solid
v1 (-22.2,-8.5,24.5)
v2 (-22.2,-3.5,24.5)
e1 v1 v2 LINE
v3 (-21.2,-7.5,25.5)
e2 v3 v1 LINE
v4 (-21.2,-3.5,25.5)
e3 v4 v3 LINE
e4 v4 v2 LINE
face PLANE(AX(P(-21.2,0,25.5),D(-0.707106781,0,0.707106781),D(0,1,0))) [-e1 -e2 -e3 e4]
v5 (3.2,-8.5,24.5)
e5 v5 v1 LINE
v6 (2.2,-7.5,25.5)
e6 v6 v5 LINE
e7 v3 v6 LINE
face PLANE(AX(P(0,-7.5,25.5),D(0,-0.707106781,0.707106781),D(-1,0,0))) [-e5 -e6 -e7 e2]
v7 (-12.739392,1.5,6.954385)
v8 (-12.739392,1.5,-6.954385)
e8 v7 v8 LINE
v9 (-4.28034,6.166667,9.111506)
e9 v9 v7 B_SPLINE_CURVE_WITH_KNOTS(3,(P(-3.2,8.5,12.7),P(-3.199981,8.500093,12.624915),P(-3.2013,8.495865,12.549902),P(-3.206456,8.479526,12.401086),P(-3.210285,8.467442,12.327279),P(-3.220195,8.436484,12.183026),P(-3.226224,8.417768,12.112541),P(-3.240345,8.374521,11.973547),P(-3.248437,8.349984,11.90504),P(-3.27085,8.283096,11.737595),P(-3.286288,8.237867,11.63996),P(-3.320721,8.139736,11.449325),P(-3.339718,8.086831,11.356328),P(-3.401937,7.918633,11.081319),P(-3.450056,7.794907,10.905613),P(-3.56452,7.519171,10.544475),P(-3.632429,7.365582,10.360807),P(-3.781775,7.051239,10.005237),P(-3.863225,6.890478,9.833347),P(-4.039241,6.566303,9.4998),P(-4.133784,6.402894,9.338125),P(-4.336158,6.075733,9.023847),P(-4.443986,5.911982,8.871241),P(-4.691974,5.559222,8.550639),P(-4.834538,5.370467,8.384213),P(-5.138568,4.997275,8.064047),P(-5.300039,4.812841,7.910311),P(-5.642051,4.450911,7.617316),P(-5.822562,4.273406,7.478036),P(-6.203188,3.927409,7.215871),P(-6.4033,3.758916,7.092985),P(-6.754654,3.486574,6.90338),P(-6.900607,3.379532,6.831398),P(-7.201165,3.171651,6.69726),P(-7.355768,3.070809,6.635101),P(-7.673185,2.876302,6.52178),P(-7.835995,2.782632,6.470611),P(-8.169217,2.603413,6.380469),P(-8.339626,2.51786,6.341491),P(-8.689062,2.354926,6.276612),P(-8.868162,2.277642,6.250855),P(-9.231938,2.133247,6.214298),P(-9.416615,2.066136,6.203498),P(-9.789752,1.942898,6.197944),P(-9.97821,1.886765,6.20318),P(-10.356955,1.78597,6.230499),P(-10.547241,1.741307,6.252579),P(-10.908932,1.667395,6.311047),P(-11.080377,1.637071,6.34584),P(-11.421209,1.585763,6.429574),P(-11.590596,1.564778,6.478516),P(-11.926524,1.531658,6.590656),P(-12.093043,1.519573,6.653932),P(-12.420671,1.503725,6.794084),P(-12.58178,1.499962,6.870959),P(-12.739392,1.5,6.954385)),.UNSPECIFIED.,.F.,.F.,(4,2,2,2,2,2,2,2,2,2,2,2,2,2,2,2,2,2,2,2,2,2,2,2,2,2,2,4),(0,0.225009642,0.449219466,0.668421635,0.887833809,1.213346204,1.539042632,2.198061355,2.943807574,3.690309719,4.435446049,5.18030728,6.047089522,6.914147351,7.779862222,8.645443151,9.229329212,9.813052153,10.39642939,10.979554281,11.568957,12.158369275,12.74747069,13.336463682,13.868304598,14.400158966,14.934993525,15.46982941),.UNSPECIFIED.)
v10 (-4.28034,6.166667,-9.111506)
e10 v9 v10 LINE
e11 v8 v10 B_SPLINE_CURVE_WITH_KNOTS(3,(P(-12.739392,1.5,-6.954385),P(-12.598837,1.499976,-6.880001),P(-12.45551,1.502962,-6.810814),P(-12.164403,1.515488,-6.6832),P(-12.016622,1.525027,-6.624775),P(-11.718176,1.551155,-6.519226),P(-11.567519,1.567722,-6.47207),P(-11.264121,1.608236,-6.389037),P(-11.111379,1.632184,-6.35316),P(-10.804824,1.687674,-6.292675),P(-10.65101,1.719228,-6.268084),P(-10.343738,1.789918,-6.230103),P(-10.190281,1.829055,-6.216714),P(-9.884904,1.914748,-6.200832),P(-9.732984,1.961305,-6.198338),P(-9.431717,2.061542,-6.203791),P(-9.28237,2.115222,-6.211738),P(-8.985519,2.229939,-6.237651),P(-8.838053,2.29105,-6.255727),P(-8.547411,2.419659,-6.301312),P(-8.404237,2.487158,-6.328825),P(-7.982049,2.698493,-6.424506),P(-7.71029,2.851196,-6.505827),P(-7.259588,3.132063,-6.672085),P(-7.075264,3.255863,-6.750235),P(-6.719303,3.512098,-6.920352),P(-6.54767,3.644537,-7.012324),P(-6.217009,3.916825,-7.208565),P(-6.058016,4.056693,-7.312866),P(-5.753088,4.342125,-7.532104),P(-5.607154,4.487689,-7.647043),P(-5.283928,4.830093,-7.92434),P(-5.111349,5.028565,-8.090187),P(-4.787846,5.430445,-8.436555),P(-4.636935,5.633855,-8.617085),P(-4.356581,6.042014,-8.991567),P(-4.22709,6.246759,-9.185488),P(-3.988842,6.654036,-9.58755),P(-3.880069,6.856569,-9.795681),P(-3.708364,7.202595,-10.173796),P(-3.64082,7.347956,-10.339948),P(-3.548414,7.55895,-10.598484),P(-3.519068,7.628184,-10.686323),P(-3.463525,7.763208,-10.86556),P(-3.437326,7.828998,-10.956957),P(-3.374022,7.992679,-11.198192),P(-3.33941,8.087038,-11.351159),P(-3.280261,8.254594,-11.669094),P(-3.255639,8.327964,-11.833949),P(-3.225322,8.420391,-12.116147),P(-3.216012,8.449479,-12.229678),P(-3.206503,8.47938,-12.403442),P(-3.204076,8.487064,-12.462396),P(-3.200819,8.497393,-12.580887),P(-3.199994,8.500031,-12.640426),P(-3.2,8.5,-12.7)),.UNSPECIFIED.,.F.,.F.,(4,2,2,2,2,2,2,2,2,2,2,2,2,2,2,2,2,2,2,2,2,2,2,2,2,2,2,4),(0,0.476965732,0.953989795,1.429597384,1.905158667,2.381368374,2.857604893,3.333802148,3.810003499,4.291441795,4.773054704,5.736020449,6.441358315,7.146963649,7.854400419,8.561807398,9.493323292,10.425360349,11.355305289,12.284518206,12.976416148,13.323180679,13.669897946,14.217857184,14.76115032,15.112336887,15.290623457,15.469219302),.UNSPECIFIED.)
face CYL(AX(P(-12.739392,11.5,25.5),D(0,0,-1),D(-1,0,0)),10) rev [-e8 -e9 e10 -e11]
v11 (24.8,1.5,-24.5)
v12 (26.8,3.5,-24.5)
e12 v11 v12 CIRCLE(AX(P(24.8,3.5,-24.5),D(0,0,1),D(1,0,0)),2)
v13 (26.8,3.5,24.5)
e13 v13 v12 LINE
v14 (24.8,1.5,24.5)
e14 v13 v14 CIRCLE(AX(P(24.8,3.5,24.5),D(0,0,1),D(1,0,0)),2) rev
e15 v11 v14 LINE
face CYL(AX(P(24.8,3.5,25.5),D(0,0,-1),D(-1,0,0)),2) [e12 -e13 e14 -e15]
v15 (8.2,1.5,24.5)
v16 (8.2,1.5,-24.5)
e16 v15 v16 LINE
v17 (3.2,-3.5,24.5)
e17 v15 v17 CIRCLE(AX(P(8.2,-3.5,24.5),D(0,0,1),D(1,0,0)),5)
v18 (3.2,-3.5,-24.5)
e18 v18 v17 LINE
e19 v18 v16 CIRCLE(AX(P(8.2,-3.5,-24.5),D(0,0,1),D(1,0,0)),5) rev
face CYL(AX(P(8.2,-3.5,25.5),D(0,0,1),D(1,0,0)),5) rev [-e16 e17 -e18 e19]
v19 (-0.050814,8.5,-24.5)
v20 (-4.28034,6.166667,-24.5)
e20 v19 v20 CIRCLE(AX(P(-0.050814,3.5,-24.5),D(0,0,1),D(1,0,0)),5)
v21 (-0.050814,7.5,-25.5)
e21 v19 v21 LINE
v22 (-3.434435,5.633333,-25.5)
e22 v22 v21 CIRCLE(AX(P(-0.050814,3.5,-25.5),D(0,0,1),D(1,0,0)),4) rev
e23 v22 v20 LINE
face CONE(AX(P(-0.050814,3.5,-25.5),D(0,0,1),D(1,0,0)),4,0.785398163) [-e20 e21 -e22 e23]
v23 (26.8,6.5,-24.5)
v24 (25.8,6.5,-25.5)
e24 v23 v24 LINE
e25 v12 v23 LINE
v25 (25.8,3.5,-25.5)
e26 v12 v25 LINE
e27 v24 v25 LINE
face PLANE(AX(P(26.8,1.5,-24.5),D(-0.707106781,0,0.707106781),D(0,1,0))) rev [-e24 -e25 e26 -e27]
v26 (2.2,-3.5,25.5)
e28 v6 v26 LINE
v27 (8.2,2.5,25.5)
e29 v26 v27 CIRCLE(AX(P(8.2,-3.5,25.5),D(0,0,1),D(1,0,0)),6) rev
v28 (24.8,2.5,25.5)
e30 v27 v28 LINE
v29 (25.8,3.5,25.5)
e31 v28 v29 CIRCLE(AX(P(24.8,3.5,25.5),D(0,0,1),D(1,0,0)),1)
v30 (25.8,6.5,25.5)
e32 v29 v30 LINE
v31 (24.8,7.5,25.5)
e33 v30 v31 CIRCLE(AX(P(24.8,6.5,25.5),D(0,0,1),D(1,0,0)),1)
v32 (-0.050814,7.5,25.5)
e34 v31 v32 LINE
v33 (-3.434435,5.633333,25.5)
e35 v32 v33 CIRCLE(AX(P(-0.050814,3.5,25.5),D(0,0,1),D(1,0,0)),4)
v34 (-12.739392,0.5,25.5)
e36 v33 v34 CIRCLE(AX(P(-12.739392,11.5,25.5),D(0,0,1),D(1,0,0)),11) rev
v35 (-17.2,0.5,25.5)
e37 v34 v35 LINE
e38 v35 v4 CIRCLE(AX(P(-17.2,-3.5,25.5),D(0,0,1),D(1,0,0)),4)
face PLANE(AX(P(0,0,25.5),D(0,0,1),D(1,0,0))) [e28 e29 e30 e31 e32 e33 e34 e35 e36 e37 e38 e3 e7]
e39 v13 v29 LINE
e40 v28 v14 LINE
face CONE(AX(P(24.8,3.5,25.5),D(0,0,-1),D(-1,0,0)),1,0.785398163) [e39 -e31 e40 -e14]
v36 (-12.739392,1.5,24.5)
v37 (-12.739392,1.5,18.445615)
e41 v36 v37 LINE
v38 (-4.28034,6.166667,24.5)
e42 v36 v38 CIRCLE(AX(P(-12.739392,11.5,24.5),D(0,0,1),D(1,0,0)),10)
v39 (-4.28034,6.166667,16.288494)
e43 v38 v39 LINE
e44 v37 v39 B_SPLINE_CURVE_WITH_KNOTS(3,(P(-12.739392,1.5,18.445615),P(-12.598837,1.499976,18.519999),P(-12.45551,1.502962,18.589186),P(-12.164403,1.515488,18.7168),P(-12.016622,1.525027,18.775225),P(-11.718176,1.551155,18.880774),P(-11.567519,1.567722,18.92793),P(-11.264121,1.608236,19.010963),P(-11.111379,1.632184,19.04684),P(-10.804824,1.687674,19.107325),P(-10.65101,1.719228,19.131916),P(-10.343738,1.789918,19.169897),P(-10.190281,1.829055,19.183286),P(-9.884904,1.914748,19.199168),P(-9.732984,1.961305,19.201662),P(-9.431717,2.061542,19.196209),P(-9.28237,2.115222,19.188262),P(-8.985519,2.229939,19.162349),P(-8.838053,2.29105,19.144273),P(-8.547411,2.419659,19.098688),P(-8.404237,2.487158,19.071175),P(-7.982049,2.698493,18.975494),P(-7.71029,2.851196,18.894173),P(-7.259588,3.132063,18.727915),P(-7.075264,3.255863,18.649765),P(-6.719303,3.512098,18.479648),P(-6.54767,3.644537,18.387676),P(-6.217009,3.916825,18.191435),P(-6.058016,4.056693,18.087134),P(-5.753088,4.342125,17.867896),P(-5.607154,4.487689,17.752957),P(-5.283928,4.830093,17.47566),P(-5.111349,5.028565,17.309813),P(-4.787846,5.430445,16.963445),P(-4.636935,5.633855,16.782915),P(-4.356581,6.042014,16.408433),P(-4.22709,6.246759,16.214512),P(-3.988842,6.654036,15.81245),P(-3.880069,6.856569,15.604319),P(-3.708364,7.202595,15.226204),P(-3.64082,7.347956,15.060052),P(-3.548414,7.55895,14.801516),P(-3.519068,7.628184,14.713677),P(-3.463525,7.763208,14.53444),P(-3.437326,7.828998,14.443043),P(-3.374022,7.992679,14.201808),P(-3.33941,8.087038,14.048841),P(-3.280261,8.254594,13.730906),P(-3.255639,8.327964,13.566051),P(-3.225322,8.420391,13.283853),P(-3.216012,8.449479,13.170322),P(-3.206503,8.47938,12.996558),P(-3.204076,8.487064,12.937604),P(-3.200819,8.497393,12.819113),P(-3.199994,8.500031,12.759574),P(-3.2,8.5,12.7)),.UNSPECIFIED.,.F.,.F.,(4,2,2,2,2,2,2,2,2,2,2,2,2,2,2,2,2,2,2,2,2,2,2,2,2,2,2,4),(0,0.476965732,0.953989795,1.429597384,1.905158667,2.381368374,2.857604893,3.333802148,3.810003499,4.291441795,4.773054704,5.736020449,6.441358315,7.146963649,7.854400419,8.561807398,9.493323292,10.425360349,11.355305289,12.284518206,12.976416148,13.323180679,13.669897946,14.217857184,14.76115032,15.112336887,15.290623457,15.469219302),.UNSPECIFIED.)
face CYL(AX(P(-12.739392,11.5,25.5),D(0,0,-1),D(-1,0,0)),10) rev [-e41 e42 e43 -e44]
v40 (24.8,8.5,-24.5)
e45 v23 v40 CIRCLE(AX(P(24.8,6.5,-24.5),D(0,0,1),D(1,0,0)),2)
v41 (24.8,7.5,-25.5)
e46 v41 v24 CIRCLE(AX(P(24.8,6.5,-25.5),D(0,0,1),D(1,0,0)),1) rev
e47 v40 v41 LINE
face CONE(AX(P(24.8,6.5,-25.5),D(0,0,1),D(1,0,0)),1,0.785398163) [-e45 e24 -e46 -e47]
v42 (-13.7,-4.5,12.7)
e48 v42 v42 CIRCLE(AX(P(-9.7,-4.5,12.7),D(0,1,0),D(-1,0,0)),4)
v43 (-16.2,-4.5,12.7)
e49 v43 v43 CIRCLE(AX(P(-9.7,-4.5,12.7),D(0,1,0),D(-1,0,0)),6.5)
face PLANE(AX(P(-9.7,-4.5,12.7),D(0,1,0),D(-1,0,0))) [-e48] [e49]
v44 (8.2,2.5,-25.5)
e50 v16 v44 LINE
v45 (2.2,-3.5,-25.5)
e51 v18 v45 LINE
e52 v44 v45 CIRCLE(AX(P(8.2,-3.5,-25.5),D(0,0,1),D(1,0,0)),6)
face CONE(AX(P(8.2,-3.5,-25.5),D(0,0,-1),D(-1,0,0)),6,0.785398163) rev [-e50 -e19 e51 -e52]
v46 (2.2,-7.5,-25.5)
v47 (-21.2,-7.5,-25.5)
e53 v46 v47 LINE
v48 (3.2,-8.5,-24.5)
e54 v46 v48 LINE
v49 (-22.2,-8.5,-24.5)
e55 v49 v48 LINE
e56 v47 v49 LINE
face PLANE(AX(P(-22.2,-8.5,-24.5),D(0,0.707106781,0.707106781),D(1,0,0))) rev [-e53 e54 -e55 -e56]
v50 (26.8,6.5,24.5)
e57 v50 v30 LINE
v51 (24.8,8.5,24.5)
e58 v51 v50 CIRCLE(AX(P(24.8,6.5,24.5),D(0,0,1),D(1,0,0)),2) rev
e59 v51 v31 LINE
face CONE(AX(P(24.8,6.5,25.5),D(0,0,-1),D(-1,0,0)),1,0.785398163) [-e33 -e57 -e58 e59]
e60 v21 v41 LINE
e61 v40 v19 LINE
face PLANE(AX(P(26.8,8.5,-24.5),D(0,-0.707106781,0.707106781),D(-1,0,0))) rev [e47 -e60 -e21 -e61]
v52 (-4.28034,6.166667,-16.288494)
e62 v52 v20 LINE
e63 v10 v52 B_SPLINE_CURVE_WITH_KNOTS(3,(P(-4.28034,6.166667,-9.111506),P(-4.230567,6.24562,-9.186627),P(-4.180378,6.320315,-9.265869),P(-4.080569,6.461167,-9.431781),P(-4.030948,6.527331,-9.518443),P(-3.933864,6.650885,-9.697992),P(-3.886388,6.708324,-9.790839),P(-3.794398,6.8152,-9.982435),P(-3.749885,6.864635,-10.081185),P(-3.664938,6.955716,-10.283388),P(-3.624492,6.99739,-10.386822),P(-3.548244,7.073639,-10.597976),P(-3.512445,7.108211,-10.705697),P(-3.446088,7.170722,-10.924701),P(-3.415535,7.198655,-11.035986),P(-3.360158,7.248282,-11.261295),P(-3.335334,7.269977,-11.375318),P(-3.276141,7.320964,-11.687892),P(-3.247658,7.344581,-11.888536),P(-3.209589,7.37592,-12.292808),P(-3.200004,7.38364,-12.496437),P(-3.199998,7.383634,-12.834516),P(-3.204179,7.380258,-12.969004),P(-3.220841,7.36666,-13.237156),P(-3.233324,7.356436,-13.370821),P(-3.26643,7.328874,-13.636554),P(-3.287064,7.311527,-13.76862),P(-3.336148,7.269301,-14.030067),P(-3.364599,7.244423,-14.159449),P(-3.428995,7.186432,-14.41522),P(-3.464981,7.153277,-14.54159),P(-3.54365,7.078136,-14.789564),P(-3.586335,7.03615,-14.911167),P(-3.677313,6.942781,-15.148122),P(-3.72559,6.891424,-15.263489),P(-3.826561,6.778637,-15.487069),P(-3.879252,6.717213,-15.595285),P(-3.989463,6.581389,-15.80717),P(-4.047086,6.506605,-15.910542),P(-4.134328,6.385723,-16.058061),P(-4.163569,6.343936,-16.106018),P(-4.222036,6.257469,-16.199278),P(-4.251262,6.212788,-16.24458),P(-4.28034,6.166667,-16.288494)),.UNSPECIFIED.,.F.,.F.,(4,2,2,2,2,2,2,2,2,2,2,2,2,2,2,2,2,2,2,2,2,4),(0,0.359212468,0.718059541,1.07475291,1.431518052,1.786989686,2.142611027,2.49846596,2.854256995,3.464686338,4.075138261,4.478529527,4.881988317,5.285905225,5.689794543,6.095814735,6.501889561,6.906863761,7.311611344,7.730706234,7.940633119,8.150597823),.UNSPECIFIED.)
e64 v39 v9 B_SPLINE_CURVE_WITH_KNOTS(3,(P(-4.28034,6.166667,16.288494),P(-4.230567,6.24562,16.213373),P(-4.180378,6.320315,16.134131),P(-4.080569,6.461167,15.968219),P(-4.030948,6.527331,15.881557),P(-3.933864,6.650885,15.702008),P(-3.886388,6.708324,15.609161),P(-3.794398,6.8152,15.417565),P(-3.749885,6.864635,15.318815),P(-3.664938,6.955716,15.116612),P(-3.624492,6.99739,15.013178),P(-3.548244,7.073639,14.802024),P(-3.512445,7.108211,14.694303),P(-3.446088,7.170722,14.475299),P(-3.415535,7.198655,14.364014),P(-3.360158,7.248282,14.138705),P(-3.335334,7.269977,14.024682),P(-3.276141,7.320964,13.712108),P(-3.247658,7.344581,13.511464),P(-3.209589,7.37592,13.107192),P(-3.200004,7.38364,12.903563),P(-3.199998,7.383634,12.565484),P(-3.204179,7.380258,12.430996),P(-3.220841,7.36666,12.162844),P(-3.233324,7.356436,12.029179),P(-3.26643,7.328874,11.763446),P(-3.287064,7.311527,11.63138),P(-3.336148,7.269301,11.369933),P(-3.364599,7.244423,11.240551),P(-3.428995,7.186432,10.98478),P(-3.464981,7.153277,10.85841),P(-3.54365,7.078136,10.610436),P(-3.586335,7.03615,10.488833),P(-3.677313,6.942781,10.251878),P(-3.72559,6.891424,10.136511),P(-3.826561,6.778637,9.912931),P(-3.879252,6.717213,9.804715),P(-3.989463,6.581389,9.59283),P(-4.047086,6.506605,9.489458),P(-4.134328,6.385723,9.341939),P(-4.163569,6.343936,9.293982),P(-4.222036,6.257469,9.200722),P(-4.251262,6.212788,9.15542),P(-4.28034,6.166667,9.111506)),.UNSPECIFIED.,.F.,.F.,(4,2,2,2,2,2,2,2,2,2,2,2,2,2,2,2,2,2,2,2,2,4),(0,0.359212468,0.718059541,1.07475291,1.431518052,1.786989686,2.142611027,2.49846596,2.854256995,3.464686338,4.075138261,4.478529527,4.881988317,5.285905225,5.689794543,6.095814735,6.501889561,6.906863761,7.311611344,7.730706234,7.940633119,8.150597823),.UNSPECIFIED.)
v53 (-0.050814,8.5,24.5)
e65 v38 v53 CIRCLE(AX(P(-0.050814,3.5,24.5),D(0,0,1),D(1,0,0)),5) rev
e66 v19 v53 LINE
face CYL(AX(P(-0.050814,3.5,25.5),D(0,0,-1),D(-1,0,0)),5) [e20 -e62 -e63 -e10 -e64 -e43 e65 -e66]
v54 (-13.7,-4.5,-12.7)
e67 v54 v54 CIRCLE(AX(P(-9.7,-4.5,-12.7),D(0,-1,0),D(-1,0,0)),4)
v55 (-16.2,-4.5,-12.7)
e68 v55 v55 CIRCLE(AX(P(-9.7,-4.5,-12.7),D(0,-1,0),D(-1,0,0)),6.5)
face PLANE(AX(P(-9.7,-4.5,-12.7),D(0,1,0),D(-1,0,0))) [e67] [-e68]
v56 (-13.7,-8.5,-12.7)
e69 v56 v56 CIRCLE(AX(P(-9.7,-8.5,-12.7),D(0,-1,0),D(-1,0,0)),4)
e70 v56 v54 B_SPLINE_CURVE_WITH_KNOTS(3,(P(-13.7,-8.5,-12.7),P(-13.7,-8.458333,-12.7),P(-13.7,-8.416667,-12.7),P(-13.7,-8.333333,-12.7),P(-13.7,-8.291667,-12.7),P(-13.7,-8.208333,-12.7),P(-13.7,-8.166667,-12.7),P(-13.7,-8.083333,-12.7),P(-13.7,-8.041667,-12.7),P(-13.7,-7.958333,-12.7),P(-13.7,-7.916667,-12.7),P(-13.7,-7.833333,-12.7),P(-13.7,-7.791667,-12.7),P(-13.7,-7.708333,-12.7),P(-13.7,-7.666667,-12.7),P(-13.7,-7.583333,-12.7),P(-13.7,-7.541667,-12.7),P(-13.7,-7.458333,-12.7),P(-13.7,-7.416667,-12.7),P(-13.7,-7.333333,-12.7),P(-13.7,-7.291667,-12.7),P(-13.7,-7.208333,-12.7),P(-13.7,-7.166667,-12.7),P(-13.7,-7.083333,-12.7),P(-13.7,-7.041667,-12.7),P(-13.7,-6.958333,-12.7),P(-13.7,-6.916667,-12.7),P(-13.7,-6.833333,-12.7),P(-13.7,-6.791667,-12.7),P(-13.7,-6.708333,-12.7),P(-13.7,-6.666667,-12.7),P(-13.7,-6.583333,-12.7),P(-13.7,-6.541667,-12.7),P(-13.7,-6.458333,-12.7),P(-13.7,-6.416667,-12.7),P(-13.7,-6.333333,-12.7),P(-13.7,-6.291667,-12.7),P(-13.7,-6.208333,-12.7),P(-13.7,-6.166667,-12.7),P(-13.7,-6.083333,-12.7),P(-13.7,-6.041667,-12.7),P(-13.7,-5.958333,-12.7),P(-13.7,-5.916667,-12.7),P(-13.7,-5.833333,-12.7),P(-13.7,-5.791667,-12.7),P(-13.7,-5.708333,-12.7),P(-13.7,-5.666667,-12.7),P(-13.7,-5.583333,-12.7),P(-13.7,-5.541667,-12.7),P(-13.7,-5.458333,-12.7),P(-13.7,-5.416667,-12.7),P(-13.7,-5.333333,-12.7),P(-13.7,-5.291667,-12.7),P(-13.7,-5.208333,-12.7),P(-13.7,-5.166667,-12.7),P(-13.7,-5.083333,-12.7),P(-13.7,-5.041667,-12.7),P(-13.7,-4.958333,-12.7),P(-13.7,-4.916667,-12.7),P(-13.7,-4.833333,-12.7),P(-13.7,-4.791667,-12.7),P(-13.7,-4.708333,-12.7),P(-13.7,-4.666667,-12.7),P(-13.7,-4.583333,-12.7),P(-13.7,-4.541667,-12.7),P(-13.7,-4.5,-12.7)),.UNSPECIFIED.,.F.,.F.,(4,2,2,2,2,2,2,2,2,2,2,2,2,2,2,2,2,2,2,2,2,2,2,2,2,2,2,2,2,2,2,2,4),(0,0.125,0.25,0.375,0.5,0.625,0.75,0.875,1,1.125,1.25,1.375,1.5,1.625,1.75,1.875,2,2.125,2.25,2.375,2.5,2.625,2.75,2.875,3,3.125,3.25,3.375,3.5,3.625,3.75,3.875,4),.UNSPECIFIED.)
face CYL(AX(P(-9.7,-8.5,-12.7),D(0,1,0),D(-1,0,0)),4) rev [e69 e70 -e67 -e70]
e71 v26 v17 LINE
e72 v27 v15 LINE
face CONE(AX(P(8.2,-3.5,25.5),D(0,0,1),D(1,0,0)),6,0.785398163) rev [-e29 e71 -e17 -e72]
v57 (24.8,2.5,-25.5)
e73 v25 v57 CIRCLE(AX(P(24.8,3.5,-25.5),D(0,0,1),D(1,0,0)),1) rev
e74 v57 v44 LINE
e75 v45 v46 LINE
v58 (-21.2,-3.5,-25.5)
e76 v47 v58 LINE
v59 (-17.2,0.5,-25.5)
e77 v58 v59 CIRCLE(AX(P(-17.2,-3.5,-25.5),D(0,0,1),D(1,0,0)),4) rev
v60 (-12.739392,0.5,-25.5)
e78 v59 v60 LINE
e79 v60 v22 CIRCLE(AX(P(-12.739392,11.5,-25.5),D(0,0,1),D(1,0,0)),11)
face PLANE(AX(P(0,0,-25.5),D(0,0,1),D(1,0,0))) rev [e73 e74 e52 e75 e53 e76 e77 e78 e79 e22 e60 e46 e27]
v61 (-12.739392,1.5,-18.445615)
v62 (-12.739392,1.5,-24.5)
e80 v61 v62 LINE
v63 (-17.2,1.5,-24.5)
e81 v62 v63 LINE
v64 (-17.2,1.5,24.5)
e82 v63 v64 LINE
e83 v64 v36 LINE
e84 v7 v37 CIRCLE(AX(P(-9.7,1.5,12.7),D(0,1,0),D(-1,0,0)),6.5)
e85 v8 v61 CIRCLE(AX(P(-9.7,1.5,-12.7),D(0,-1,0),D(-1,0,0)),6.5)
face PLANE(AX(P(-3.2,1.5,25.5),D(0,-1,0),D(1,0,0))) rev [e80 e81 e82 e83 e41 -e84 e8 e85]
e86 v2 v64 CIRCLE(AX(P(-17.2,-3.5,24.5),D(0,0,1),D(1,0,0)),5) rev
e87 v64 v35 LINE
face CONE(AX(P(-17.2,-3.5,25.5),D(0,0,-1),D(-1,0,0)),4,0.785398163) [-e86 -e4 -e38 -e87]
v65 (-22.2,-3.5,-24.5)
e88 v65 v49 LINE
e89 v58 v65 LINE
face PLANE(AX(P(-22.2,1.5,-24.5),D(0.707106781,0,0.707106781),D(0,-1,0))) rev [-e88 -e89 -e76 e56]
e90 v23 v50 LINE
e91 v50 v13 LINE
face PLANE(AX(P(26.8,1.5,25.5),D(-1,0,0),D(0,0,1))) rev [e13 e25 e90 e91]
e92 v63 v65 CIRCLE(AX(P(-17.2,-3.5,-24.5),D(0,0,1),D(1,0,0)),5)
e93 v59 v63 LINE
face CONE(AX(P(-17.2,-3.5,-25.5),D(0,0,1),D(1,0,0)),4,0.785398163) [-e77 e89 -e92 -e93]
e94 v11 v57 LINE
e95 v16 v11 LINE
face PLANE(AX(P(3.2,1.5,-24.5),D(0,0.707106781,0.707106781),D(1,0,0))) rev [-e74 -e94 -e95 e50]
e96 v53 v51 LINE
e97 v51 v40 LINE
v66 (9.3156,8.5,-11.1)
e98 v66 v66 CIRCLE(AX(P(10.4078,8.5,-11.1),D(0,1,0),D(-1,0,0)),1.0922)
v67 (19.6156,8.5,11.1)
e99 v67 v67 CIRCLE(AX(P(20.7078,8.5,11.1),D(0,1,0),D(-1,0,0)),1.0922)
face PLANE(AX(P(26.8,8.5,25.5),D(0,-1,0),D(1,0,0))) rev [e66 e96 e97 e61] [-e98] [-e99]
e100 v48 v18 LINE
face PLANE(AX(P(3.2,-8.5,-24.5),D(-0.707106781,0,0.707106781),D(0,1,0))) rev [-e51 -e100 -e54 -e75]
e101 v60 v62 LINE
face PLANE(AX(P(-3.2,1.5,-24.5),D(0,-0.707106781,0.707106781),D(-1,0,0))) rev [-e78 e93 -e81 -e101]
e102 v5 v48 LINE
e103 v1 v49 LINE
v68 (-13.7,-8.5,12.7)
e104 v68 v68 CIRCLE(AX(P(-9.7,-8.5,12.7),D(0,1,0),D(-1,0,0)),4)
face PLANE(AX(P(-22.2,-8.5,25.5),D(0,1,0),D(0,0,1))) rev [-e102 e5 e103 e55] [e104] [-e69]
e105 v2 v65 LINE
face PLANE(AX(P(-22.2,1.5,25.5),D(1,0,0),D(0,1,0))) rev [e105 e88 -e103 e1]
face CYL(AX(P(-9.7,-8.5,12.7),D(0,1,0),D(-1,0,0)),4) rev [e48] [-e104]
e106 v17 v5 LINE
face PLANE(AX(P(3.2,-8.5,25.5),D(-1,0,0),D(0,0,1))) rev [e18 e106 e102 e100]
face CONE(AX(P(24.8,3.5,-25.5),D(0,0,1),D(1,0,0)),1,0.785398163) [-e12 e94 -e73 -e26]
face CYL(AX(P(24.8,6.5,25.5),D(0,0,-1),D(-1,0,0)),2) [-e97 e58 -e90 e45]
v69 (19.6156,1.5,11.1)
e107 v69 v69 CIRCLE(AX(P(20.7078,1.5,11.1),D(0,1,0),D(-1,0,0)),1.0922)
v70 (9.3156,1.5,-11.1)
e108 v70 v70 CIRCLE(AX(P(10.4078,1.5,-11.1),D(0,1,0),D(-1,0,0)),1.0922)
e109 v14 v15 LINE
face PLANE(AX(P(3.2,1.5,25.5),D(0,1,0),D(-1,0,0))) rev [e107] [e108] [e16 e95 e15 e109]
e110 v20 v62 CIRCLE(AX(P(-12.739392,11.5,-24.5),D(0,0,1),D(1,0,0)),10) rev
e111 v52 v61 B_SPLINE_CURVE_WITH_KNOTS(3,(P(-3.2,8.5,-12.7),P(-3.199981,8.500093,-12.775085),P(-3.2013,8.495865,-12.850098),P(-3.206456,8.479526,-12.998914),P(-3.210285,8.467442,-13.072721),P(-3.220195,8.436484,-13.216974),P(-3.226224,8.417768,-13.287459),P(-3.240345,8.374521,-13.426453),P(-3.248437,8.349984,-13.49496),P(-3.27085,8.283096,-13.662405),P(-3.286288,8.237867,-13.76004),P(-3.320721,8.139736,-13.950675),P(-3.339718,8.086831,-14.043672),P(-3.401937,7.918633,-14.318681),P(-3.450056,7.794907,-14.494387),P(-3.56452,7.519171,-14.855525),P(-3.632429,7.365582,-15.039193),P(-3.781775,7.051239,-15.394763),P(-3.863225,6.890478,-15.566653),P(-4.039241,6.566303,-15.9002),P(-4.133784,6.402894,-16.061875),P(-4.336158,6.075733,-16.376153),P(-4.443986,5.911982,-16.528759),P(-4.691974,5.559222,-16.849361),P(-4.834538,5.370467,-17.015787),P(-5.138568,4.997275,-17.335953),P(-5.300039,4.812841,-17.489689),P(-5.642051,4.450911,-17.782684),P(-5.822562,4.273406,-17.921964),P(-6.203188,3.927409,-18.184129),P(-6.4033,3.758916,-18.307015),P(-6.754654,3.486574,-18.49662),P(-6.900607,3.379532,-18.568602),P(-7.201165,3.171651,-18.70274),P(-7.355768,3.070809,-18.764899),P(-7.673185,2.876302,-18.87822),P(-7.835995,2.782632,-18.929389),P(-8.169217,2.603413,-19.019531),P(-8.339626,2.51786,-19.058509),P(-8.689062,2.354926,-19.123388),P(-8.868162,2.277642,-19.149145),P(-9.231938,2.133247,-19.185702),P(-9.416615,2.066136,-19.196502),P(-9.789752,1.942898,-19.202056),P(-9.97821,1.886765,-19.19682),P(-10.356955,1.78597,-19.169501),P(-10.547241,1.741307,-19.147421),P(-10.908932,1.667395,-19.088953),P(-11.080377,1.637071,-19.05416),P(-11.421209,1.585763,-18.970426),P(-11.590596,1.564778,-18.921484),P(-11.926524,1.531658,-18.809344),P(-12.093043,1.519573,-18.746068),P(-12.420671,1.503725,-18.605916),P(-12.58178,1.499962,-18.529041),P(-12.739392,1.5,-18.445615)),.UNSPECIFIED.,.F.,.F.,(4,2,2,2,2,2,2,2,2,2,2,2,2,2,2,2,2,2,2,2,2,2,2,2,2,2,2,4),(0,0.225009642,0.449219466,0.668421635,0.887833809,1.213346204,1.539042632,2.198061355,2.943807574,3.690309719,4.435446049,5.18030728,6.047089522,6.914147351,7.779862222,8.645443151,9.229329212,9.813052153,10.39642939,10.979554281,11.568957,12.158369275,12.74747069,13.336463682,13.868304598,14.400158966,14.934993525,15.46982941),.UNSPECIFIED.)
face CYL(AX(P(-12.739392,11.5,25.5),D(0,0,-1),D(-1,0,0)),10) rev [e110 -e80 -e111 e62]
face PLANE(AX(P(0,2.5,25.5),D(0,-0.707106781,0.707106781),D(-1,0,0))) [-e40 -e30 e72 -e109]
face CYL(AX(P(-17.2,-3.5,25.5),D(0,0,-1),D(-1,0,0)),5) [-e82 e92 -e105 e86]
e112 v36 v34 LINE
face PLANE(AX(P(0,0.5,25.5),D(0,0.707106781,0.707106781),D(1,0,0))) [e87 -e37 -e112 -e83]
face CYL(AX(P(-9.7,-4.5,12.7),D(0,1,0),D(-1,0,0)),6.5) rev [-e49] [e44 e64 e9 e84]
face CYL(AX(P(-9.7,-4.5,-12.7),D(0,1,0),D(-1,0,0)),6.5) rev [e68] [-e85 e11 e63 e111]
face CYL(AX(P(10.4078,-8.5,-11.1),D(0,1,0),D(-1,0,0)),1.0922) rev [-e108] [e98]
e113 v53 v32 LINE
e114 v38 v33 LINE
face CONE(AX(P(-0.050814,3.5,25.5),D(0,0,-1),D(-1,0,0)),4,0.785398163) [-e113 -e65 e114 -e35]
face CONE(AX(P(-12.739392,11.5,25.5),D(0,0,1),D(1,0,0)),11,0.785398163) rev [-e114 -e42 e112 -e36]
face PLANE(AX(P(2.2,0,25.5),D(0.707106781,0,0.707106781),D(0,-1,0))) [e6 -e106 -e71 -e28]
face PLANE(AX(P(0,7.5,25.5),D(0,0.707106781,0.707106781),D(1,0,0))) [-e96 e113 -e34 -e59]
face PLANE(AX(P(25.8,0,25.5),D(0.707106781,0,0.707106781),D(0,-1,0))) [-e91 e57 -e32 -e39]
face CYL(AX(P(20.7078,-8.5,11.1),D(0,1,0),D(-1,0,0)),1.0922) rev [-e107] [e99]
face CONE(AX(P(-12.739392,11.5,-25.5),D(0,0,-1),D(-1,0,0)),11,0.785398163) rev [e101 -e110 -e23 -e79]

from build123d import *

# Parameters (mm, degrees)
BOSS_EXTRUDE1_DEPTH = 25.5
SKETCH3_R           = 4
CUT_EXTRUDE1_DEPTH  = 39.320882036
SKETCH3_4_R         = 6.5
SKETCH3_4_R_2       = 4
CUT_EXTRUDE2_DEPTH  = 6
SKETCH9_R           = 1.0922
CUT_EXTRUDE3_DEPTH  = 41.712283159
FILLET1_R           = 10
FILLET2_R           = 5
FILLET4_R           = 2
CHAMFER1_SIZE       = 1


with BuildPart() as part:
    # Sketch1 → Boss-Extrude1 (new, symmetric)
    with BuildSketch(Plane.XY):
        Polygon((-22.2, -8.5), (3.2, -8.5), (3.2, 1.5), (26.8, 1.5), (26.8, 8.5), (-3.2, 8.5), (-3.2, 1.5), (-22.2, 1.5), align=None)
    extrude(amount=BOSS_EXTRUDE1_DEPTH, both=True)

    # Sketch3 → Cut-Extrude1 (cut, through all)
    with BuildSketch(Plane(origin=(0, 1.5, 0), x_dir=(1, 0, 0), z_dir=(0, 1, 0))):
        with Locations(Location((-9.7, -12.7, 0), (0, 0, 180))):
            Circle(SKETCH3_R)
    cut_extrude1 = extrude(amount=-CUT_EXTRUDE1_DEPTH, mode=Mode.SUBTRACT)

    # Sketch3<4> → Cut-Extrude2 (cut)
    with BuildSketch(Plane(origin=(0, 1.5, 0), x_dir=(1, 0, 0), z_dir=(0, 1, 0))):
        with Locations(Location((-9.7, -12.7, 0), (0, 0, 180))):
            Circle(SKETCH3_4_R)
        with Locations(Location((-9.7, -12.7, 0), (0, 0, 180))):
            Circle(SKETCH3_4_R_2, mode=Mode.SUBTRACT)
    cut_extrude2 = extrude(amount=-CUT_EXTRUDE2_DEPTH, mode=Mode.SUBTRACT)

    # Mirror1: Cut-Extrude1, Cut-Extrude2 across plane
    add(cut_extrude1.mirror(Plane.XY), mode=Mode.SUBTRACT)
    add(cut_extrude2.mirror(Plane.XY), mode=Mode.SUBTRACT)

    # Sketch9 → Cut-Extrude3 (cut, through all)
    with BuildSketch(Plane(origin=(0, 8.5, 0), x_dir=(1, 0, 0), z_dir=(0, 1, 0))):
        with Locations(Location((10.4078, 11.1, 0), (0, 0, 180))):
            Circle(SKETCH9_R)
        with Locations(Location((20.7078, -11.1, 0), (0, 0, 180))):
            Circle(SKETCH9_R)
    extrude(amount=-CUT_EXTRUDE3_DEPTH, mode=Mode.SUBTRACT)

    # Fillet1
    # the kernel refuses this fillet: 10 mm, written as the material it adds along each edge
    with BuildSketch(Plane(origin=(-3.2, 1.5, 25.5), x_dir=(0, 1, 0), z_dir=(0, 0, -1))) as fillet1_piece_1_section:
        with BuildLine():
            CenterArc((10, -9.539392014), FILLET1_R, 107.457603124, 72.542396876)
            Line((0, -9.539392014), (0, 0))
            Line((0, 0), (7, 0))
        make_face()
    fillet1_piece_1 = extrude(amount=12.8, mode=Mode.PRIVATE)
    fillet1_piece_1 = fillet1_piece_1 - Plane(origin=(-9.7, 1.5, 12.7), x_dir=(-1, 0, 0), z_dir=(0, 1, 0)) * Cylinder(6.5, 64, mode=Mode.PRIVATE)
    add(fillet1_piece_1)
    with BuildSketch(Plane(origin=(-3.2, 1.5, -12.700000035), x_dir=(0, 1, 0), z_dir=(0, 0, -1))) as fillet1_piece_2_section:
        with BuildLine():
            CenterArc((10, -9.539392014), FILLET1_R, 107.457603124, 72.542396876)
            Line((0, -9.539392014), (0, 0))
            Line((0, 0), (7, 0))
        make_face()
    fillet1_piece_2 = extrude(amount=12.799999965, mode=Mode.PRIVATE)
    fillet1_piece_2 = fillet1_piece_2 - Plane(origin=(-9.7, 1.5, -12.7), x_dir=(-1, 0, 0), z_dir=(0, 1, 0)) * Cylinder(6.5, 64, mode=Mode.PRIVATE)
    add(fillet1_piece_2)
    with BuildSketch(Plane(origin=(-3.2, 1.5, 12.7), x_dir=(0, 1, 0), z_dir=(0, 0, -1))) as fillet1_piece_3_section:
        with BuildLine():
            CenterArc((10, -9.539392014), FILLET1_R, 107.457603124, 72.542396876)
            Line((0, -9.539392014), (0, 0))
            Line((0, 0), (7, 0))
        make_face()
    fillet1_piece_3 = extrude(amount=25.400000035, mode=Mode.PRIVATE)
    fillet1_piece_3 = fillet1_piece_3 - Plane(origin=(-9.7, 1.5, -12.7), x_dir=(-1, 0, 0), z_dir=(0, 1, 0)) * Cylinder(6.5, 89, mode=Mode.PRIVATE)
    fillet1_piece_3 = fillet1_piece_3 - Plane(origin=(-9.7, 1.5, 12.7), x_dir=(-1, 0, 0), z_dir=(0, 1, 0)) * Cylinder(6.5, 89, mode=Mode.PRIVATE)
    add(fillet1_piece_3)

    # Fillet2
    # the kernel refuses this fillet: 5 mm, written as the material it adds along each edge
    with BuildSketch(Plane(origin=(3.2, 1.5, -25.5), x_dir=(0, -1, 0), z_dir=(0, 0, 1))) as fillet2_piece_1:
        with BuildLine():
            CenterArc((FILLET2_R, FILLET2_R), FILLET2_R, 180, 90)
            Line((0, FILLET2_R), (0, 0))
            Line((0, 0), (FILLET2_R, 0))
        make_face()
    extrude(amount=51)
    # the kernel refuses this fillet: 5 mm, written as the material it takes off along each edge
    with BuildSketch(Plane(origin=(-3.2, 8.5, -33.372963816), x_dir=(1, 0, 0), z_dir=(0, 0, 1))) as fillet2_2_piece_1:
        with BuildLine():
            CenterArc((3.149185526, -5), FILLET2_R, 90, 57.769047364)
            ThreePointArc((-1.080340321, -2.333333333), (-0.464861443, -1.201534828), (0, 0))
            Line((0, 0), (3.149185526, 0))
        make_face()
    extrude(amount=20.67296378, mode=Mode.SUBTRACT)
    with BuildSketch(Plane(origin=(-22.2, 1.5, 38), x_dir=(1, 0, 0), z_dir=(0, 0, -1))) as fillet2_2_piece_2:
        with BuildLine():
            CenterArc((FILLET2_R, FILLET2_R), FILLET2_R, 180, 90)
            Line((0, FILLET2_R), (0, 0))
            Line((0, 0), (FILLET2_R, 0))
        make_face()
    extrude(amount=76, mode=Mode.SUBTRACT)
    with BuildSketch(Plane(origin=(-3.2, 8.5, -12.700000035), x_dir=(-0.42015348282673015, -0.9074530571156663, 0), z_dir=(0, 0, 1))) as fillet2_2_piece_3:
        with BuildLine():
            CenterArc((3.214124019, 4.958505447), FILLET2_R, 204.84427788, 57.769047364)
            Line((-1.323141267, 2.857738033), (0, 0))
            ThreePointArc((0, 0), (1.285649607, 0.082989105), (2.571299215, 0))
        make_face()
    extrude(amount=25.400000035, mode=Mode.SUBTRACT)
    with BuildSketch(Plane(origin=(-3.2, 8.5, 12.7), x_dir=(1, 0, 0), z_dir=(0, 0, 1))) as fillet2_2_piece_4:
        with BuildLine():
            CenterArc((3.149185526, -5), FILLET2_R, 90, 57.769047364)
            ThreePointArc((-1.080340321, -2.333333333), (-0.464861443, -1.201534828), (0, 0))
            Line((0, 0), (3.149185526, 0))
        make_face()
    extrude(amount=20.672963816, mode=Mode.SUBTRACT)

    # Fillet4
    fillet4_edges = [part.edges().sort_by_distance(p)[0] for p in [
        (26.8, 8.5, 0),
        (26.8, 1.5, 0),
    ]]
    fillet(fillet4_edges, radius=FILLET4_R)

    # Chamfer1
    chamfer1_edges = [part.edges().sort_by_distance(p)[0] for p in [
        (12.374592763, 8.5, 25.5),
        (12.374592763, 8.5, -25.5),
        (26.8, 5, -25.5),
        (26.214213562, 2.085786438, -25.5),
        (26.214213562, 7.914213562, -25.5),
        (26.8, 5, 25.5),
        (26.214213562, 2.085786438, 25.5),
        (26.214213562, 7.914213562, 25.5),
        (3.2, -6, -25.5),
        (-9.5, -8.5, -25.5),
        (3.2, -6, 25.5),
        (-14.969696007, 1.5, -25.5),
        (-14.969696007, 1.5, 25.5),
        (-7.908933099, 2.744049642, -25.5),
        (-7.908933099, 2.744049642, 25.5),
        (-22.2, -6, 25.5),
        (16.5, 1.5, 25.5),
        (-20.735533906, 0.035533906, 25.5),
        (-2.466043931, 7.877975179, 25.5),
        (-22.2, -6, -25.5),
        (16.5, 1.5, -25.5),
        (-20.735533906, 0.035533906, -25.5),
        (-2.466043931, 7.877975179, -25.5),
        (4.664466094, 0.035533906, -25.5),
        (4.664466094, 0.035533906, 25.5),
        (-9.5, -8.5, 25.5),
    ]]
    chamfer(chamfer1_edges, length=CHAMFER1_SIZE)


solid = part.part
